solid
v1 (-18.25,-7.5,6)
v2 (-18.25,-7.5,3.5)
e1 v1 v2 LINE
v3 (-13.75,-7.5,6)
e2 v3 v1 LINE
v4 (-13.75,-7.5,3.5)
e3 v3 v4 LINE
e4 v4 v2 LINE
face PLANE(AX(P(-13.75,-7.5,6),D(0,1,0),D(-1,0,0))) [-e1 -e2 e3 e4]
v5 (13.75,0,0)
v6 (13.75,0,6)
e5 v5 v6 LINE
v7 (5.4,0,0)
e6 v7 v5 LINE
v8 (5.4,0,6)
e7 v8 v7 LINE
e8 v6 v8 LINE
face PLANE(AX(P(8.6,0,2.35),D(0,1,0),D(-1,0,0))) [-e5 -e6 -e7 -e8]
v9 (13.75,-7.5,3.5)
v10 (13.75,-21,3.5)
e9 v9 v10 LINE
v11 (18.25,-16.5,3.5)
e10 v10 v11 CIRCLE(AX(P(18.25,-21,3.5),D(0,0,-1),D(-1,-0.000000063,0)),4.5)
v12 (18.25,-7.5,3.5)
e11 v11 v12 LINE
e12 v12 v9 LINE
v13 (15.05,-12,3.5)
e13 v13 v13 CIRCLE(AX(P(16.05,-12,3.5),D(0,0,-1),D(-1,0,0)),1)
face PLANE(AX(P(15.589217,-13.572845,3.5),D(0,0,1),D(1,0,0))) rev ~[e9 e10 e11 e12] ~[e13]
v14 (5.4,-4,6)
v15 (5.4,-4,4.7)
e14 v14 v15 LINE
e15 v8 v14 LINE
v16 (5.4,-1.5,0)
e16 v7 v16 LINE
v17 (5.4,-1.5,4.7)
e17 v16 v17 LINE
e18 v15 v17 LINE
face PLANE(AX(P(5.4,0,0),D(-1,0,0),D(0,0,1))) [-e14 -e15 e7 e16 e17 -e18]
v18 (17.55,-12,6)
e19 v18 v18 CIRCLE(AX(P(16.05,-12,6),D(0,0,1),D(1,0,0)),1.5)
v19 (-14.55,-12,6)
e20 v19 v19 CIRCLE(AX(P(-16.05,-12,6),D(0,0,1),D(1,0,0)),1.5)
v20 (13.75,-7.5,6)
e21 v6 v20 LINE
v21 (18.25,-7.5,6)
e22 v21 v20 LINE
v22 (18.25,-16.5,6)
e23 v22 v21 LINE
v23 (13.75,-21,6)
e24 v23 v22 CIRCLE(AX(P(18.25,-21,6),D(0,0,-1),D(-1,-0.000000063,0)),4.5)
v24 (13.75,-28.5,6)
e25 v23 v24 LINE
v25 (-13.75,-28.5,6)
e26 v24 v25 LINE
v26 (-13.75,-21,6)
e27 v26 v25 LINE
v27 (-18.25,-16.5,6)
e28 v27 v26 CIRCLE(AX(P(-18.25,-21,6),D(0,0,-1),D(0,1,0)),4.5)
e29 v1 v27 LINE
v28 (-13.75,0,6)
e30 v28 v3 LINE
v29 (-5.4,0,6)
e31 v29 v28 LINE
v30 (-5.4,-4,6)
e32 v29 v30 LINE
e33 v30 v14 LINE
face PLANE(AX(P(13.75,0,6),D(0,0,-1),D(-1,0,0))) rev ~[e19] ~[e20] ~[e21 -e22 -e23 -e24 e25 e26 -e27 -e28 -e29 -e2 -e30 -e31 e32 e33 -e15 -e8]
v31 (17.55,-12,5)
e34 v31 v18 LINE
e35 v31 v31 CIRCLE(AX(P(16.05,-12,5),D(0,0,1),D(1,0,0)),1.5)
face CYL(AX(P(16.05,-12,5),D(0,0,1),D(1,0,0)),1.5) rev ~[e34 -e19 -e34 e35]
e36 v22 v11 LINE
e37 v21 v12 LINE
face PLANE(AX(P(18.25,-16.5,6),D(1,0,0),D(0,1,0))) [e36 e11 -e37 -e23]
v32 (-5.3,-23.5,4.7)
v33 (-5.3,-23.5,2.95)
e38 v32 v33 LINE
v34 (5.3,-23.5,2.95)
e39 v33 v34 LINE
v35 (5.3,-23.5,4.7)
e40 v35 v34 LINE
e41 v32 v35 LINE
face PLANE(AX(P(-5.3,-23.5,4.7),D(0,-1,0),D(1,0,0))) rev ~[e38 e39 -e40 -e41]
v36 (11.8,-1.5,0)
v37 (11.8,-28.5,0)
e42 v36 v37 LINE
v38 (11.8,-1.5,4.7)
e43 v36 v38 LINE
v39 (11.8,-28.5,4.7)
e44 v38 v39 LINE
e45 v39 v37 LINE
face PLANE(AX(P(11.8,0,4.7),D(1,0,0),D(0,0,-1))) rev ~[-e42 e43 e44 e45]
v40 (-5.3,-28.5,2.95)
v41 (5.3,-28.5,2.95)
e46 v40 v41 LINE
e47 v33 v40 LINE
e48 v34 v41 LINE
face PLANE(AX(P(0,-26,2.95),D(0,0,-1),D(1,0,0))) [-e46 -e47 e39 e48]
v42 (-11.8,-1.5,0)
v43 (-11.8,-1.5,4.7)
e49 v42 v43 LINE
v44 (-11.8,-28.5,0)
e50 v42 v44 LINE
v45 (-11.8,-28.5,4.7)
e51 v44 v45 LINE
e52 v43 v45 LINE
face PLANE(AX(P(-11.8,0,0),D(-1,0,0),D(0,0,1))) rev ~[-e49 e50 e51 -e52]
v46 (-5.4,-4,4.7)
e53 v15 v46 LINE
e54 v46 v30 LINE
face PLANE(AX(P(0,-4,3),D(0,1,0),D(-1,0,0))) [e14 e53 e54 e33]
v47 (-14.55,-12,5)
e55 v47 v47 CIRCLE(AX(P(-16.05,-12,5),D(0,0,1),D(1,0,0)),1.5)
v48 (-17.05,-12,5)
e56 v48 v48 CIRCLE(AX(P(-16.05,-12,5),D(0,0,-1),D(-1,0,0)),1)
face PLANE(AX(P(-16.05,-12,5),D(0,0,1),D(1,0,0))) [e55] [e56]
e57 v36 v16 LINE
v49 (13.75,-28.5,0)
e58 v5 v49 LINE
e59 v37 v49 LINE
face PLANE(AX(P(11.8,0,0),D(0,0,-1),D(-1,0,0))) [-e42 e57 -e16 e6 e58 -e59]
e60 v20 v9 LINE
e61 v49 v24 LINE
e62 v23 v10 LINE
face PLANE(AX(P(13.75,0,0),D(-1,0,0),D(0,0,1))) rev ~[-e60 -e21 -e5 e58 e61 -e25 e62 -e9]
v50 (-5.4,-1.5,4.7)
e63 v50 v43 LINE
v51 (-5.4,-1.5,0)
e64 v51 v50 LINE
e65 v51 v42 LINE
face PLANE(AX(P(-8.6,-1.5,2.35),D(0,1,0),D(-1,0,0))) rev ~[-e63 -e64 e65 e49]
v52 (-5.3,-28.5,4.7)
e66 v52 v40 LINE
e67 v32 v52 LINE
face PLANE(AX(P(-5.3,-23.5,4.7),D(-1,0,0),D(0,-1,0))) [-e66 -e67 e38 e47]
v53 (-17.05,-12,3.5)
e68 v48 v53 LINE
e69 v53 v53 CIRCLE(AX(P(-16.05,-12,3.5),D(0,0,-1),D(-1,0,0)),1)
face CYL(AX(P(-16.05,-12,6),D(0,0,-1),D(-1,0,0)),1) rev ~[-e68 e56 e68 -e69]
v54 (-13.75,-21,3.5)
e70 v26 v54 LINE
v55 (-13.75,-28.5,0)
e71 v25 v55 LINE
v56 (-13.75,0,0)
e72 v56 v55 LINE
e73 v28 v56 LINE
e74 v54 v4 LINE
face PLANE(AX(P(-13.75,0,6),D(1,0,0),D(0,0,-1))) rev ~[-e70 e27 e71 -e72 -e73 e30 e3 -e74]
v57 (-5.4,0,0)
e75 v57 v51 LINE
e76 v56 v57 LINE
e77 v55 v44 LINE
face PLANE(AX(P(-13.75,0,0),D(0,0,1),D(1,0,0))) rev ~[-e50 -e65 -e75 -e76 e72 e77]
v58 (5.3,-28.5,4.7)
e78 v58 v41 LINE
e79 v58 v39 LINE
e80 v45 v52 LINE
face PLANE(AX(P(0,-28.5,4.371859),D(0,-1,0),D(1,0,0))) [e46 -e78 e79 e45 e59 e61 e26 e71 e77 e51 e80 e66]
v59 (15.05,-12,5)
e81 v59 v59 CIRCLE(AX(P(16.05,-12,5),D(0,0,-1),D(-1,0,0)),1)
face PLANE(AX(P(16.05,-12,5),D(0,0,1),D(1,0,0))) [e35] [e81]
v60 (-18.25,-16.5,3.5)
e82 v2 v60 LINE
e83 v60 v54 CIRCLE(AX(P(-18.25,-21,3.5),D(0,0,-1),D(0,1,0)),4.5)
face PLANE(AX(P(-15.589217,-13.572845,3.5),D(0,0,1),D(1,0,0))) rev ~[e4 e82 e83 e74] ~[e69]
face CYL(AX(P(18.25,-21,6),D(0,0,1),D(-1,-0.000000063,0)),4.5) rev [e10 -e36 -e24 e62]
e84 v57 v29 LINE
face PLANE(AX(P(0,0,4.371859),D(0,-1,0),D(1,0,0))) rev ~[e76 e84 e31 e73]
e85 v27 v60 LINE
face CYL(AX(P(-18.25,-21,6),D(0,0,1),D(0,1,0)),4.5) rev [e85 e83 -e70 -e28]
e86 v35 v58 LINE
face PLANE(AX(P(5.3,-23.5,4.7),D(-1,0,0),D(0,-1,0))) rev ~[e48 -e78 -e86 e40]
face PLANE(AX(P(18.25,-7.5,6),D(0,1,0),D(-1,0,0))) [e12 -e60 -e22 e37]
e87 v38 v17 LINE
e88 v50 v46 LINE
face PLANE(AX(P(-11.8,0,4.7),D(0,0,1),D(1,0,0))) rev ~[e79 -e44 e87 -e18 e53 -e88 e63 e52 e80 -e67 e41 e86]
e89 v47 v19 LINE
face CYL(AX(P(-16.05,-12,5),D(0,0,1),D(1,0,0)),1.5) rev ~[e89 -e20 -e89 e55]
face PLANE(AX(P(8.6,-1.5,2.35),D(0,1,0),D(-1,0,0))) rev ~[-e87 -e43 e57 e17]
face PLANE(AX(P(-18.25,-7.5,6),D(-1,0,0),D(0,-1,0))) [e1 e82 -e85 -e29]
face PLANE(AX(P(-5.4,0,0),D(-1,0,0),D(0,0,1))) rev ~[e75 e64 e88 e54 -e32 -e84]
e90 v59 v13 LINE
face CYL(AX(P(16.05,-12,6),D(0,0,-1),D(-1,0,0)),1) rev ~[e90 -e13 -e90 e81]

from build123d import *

# Parameters (mm, degrees)
F1_DEPTH       = 28.5
F5_DEPTH       = 2.5
F6_D           = 2
F6_CBORE_D     = 3
F6_CBORE_DEPTH = 1
F7_DEPTH       = 4
F8_W           = 10.6
F8_H           = 5
F9_DEPTH       = 1.75
F3_W           = 6.4
F3_H           = 4.7
F10_DEPTH      = 1.5


# Not quite as in the source:
# - ends of sketch curves that miss each other by under 0.0002 mm in the source are joined


with BuildPart() as f1:
    # F0 (on Front) → F1 (new body)
    with BuildSketch(Plane.XZ):
        Polygon((13.75, 6), (-13.75, 6), (-13.75, 0), (-11.8, 0), (-11.8, 4.7), (11.8, 4.7), (11.8, 0), (13.75, 0), align=None)
    extrude(amount=F1_DEPTH)

    # F4 (on face) → F5 (join)
    with BuildSketch(Plane.XY.offset(6)):
        with BuildLine():
            Line((-13.75, -7.4999997169), (-18.25, -7.4999997169))
            Line((-18.25, -7.4999997169), (-18.25, -16.4999997169))
            ThreePointArc((-18.25, -16.4999997169), (-15.0680194847, -17.8180192015), (-13.75, -20.9999997169))
            Line((-13.75, -20.9999997169), (-13.75, -7.4999997169))
        make_face()
        with BuildLine():
            Line((18.25, -7.4999999106), (13.75, -7.4999999106))
            Line((13.75, -7.4999999106), (13.75, -21))
            ThreePointArc((13.75, -21), (15.0680194847, -17.8180192015), (18.25, -16.4999997169))
            Line((18.25, -16.4999997169), (18.25, -7.4999999106))
        make_face()
    extrude(amount=-F5_DEPTH)

    # F6 (through all)
    with Locations(Plane.XY.offset(6)):
        with Locations((-16.05, -11.9999998212), (16.05, -11.9999998212)):
            CounterBoreHole(F6_D / 2, F6_CBORE_D / 2, F6_CBORE_DEPTH)

    # F3 (on face) → F7 (cut)
    with BuildSketch(Plane(origin=(0, 0, 0), x_dir=(-1, 0, 0), z_dir=(0, 1, 0))):
        Polygon((-5.4, 4.7), (-5.4, 0), (0, 0), (5.4, 0), (5.4, 4.7), (5.4, 6), (-5.4, 6), align=None)
    extrude(amount=-F7_DEPTH, mode=Mode.SUBTRACT)

    # F8 (on face) → F9 (join)
    with BuildSketch(Plane(origin=(0, 0, 4.7), x_dir=(1, 0, 0), z_dir=(0, 0, -1))):
        with Locations((0, 26)):
            Rectangle(F8_W, F8_H)
    extrude(amount=F9_DEPTH)

    # F3 (on face) → F10 (join)
    with BuildSketch(Plane(origin=(0, 0, 0), x_dir=(-1, 0, 0), z_dir=(0, 1, 0))):
        with Locations((-8.6, 2.35)):
            Rectangle(F3_W, F3_H)
        with Locations((8.6, 2.35)):
            Rectangle(F3_W, F3_H)
    extrude(amount=-F10_DEPTH)


solid = f1.part
